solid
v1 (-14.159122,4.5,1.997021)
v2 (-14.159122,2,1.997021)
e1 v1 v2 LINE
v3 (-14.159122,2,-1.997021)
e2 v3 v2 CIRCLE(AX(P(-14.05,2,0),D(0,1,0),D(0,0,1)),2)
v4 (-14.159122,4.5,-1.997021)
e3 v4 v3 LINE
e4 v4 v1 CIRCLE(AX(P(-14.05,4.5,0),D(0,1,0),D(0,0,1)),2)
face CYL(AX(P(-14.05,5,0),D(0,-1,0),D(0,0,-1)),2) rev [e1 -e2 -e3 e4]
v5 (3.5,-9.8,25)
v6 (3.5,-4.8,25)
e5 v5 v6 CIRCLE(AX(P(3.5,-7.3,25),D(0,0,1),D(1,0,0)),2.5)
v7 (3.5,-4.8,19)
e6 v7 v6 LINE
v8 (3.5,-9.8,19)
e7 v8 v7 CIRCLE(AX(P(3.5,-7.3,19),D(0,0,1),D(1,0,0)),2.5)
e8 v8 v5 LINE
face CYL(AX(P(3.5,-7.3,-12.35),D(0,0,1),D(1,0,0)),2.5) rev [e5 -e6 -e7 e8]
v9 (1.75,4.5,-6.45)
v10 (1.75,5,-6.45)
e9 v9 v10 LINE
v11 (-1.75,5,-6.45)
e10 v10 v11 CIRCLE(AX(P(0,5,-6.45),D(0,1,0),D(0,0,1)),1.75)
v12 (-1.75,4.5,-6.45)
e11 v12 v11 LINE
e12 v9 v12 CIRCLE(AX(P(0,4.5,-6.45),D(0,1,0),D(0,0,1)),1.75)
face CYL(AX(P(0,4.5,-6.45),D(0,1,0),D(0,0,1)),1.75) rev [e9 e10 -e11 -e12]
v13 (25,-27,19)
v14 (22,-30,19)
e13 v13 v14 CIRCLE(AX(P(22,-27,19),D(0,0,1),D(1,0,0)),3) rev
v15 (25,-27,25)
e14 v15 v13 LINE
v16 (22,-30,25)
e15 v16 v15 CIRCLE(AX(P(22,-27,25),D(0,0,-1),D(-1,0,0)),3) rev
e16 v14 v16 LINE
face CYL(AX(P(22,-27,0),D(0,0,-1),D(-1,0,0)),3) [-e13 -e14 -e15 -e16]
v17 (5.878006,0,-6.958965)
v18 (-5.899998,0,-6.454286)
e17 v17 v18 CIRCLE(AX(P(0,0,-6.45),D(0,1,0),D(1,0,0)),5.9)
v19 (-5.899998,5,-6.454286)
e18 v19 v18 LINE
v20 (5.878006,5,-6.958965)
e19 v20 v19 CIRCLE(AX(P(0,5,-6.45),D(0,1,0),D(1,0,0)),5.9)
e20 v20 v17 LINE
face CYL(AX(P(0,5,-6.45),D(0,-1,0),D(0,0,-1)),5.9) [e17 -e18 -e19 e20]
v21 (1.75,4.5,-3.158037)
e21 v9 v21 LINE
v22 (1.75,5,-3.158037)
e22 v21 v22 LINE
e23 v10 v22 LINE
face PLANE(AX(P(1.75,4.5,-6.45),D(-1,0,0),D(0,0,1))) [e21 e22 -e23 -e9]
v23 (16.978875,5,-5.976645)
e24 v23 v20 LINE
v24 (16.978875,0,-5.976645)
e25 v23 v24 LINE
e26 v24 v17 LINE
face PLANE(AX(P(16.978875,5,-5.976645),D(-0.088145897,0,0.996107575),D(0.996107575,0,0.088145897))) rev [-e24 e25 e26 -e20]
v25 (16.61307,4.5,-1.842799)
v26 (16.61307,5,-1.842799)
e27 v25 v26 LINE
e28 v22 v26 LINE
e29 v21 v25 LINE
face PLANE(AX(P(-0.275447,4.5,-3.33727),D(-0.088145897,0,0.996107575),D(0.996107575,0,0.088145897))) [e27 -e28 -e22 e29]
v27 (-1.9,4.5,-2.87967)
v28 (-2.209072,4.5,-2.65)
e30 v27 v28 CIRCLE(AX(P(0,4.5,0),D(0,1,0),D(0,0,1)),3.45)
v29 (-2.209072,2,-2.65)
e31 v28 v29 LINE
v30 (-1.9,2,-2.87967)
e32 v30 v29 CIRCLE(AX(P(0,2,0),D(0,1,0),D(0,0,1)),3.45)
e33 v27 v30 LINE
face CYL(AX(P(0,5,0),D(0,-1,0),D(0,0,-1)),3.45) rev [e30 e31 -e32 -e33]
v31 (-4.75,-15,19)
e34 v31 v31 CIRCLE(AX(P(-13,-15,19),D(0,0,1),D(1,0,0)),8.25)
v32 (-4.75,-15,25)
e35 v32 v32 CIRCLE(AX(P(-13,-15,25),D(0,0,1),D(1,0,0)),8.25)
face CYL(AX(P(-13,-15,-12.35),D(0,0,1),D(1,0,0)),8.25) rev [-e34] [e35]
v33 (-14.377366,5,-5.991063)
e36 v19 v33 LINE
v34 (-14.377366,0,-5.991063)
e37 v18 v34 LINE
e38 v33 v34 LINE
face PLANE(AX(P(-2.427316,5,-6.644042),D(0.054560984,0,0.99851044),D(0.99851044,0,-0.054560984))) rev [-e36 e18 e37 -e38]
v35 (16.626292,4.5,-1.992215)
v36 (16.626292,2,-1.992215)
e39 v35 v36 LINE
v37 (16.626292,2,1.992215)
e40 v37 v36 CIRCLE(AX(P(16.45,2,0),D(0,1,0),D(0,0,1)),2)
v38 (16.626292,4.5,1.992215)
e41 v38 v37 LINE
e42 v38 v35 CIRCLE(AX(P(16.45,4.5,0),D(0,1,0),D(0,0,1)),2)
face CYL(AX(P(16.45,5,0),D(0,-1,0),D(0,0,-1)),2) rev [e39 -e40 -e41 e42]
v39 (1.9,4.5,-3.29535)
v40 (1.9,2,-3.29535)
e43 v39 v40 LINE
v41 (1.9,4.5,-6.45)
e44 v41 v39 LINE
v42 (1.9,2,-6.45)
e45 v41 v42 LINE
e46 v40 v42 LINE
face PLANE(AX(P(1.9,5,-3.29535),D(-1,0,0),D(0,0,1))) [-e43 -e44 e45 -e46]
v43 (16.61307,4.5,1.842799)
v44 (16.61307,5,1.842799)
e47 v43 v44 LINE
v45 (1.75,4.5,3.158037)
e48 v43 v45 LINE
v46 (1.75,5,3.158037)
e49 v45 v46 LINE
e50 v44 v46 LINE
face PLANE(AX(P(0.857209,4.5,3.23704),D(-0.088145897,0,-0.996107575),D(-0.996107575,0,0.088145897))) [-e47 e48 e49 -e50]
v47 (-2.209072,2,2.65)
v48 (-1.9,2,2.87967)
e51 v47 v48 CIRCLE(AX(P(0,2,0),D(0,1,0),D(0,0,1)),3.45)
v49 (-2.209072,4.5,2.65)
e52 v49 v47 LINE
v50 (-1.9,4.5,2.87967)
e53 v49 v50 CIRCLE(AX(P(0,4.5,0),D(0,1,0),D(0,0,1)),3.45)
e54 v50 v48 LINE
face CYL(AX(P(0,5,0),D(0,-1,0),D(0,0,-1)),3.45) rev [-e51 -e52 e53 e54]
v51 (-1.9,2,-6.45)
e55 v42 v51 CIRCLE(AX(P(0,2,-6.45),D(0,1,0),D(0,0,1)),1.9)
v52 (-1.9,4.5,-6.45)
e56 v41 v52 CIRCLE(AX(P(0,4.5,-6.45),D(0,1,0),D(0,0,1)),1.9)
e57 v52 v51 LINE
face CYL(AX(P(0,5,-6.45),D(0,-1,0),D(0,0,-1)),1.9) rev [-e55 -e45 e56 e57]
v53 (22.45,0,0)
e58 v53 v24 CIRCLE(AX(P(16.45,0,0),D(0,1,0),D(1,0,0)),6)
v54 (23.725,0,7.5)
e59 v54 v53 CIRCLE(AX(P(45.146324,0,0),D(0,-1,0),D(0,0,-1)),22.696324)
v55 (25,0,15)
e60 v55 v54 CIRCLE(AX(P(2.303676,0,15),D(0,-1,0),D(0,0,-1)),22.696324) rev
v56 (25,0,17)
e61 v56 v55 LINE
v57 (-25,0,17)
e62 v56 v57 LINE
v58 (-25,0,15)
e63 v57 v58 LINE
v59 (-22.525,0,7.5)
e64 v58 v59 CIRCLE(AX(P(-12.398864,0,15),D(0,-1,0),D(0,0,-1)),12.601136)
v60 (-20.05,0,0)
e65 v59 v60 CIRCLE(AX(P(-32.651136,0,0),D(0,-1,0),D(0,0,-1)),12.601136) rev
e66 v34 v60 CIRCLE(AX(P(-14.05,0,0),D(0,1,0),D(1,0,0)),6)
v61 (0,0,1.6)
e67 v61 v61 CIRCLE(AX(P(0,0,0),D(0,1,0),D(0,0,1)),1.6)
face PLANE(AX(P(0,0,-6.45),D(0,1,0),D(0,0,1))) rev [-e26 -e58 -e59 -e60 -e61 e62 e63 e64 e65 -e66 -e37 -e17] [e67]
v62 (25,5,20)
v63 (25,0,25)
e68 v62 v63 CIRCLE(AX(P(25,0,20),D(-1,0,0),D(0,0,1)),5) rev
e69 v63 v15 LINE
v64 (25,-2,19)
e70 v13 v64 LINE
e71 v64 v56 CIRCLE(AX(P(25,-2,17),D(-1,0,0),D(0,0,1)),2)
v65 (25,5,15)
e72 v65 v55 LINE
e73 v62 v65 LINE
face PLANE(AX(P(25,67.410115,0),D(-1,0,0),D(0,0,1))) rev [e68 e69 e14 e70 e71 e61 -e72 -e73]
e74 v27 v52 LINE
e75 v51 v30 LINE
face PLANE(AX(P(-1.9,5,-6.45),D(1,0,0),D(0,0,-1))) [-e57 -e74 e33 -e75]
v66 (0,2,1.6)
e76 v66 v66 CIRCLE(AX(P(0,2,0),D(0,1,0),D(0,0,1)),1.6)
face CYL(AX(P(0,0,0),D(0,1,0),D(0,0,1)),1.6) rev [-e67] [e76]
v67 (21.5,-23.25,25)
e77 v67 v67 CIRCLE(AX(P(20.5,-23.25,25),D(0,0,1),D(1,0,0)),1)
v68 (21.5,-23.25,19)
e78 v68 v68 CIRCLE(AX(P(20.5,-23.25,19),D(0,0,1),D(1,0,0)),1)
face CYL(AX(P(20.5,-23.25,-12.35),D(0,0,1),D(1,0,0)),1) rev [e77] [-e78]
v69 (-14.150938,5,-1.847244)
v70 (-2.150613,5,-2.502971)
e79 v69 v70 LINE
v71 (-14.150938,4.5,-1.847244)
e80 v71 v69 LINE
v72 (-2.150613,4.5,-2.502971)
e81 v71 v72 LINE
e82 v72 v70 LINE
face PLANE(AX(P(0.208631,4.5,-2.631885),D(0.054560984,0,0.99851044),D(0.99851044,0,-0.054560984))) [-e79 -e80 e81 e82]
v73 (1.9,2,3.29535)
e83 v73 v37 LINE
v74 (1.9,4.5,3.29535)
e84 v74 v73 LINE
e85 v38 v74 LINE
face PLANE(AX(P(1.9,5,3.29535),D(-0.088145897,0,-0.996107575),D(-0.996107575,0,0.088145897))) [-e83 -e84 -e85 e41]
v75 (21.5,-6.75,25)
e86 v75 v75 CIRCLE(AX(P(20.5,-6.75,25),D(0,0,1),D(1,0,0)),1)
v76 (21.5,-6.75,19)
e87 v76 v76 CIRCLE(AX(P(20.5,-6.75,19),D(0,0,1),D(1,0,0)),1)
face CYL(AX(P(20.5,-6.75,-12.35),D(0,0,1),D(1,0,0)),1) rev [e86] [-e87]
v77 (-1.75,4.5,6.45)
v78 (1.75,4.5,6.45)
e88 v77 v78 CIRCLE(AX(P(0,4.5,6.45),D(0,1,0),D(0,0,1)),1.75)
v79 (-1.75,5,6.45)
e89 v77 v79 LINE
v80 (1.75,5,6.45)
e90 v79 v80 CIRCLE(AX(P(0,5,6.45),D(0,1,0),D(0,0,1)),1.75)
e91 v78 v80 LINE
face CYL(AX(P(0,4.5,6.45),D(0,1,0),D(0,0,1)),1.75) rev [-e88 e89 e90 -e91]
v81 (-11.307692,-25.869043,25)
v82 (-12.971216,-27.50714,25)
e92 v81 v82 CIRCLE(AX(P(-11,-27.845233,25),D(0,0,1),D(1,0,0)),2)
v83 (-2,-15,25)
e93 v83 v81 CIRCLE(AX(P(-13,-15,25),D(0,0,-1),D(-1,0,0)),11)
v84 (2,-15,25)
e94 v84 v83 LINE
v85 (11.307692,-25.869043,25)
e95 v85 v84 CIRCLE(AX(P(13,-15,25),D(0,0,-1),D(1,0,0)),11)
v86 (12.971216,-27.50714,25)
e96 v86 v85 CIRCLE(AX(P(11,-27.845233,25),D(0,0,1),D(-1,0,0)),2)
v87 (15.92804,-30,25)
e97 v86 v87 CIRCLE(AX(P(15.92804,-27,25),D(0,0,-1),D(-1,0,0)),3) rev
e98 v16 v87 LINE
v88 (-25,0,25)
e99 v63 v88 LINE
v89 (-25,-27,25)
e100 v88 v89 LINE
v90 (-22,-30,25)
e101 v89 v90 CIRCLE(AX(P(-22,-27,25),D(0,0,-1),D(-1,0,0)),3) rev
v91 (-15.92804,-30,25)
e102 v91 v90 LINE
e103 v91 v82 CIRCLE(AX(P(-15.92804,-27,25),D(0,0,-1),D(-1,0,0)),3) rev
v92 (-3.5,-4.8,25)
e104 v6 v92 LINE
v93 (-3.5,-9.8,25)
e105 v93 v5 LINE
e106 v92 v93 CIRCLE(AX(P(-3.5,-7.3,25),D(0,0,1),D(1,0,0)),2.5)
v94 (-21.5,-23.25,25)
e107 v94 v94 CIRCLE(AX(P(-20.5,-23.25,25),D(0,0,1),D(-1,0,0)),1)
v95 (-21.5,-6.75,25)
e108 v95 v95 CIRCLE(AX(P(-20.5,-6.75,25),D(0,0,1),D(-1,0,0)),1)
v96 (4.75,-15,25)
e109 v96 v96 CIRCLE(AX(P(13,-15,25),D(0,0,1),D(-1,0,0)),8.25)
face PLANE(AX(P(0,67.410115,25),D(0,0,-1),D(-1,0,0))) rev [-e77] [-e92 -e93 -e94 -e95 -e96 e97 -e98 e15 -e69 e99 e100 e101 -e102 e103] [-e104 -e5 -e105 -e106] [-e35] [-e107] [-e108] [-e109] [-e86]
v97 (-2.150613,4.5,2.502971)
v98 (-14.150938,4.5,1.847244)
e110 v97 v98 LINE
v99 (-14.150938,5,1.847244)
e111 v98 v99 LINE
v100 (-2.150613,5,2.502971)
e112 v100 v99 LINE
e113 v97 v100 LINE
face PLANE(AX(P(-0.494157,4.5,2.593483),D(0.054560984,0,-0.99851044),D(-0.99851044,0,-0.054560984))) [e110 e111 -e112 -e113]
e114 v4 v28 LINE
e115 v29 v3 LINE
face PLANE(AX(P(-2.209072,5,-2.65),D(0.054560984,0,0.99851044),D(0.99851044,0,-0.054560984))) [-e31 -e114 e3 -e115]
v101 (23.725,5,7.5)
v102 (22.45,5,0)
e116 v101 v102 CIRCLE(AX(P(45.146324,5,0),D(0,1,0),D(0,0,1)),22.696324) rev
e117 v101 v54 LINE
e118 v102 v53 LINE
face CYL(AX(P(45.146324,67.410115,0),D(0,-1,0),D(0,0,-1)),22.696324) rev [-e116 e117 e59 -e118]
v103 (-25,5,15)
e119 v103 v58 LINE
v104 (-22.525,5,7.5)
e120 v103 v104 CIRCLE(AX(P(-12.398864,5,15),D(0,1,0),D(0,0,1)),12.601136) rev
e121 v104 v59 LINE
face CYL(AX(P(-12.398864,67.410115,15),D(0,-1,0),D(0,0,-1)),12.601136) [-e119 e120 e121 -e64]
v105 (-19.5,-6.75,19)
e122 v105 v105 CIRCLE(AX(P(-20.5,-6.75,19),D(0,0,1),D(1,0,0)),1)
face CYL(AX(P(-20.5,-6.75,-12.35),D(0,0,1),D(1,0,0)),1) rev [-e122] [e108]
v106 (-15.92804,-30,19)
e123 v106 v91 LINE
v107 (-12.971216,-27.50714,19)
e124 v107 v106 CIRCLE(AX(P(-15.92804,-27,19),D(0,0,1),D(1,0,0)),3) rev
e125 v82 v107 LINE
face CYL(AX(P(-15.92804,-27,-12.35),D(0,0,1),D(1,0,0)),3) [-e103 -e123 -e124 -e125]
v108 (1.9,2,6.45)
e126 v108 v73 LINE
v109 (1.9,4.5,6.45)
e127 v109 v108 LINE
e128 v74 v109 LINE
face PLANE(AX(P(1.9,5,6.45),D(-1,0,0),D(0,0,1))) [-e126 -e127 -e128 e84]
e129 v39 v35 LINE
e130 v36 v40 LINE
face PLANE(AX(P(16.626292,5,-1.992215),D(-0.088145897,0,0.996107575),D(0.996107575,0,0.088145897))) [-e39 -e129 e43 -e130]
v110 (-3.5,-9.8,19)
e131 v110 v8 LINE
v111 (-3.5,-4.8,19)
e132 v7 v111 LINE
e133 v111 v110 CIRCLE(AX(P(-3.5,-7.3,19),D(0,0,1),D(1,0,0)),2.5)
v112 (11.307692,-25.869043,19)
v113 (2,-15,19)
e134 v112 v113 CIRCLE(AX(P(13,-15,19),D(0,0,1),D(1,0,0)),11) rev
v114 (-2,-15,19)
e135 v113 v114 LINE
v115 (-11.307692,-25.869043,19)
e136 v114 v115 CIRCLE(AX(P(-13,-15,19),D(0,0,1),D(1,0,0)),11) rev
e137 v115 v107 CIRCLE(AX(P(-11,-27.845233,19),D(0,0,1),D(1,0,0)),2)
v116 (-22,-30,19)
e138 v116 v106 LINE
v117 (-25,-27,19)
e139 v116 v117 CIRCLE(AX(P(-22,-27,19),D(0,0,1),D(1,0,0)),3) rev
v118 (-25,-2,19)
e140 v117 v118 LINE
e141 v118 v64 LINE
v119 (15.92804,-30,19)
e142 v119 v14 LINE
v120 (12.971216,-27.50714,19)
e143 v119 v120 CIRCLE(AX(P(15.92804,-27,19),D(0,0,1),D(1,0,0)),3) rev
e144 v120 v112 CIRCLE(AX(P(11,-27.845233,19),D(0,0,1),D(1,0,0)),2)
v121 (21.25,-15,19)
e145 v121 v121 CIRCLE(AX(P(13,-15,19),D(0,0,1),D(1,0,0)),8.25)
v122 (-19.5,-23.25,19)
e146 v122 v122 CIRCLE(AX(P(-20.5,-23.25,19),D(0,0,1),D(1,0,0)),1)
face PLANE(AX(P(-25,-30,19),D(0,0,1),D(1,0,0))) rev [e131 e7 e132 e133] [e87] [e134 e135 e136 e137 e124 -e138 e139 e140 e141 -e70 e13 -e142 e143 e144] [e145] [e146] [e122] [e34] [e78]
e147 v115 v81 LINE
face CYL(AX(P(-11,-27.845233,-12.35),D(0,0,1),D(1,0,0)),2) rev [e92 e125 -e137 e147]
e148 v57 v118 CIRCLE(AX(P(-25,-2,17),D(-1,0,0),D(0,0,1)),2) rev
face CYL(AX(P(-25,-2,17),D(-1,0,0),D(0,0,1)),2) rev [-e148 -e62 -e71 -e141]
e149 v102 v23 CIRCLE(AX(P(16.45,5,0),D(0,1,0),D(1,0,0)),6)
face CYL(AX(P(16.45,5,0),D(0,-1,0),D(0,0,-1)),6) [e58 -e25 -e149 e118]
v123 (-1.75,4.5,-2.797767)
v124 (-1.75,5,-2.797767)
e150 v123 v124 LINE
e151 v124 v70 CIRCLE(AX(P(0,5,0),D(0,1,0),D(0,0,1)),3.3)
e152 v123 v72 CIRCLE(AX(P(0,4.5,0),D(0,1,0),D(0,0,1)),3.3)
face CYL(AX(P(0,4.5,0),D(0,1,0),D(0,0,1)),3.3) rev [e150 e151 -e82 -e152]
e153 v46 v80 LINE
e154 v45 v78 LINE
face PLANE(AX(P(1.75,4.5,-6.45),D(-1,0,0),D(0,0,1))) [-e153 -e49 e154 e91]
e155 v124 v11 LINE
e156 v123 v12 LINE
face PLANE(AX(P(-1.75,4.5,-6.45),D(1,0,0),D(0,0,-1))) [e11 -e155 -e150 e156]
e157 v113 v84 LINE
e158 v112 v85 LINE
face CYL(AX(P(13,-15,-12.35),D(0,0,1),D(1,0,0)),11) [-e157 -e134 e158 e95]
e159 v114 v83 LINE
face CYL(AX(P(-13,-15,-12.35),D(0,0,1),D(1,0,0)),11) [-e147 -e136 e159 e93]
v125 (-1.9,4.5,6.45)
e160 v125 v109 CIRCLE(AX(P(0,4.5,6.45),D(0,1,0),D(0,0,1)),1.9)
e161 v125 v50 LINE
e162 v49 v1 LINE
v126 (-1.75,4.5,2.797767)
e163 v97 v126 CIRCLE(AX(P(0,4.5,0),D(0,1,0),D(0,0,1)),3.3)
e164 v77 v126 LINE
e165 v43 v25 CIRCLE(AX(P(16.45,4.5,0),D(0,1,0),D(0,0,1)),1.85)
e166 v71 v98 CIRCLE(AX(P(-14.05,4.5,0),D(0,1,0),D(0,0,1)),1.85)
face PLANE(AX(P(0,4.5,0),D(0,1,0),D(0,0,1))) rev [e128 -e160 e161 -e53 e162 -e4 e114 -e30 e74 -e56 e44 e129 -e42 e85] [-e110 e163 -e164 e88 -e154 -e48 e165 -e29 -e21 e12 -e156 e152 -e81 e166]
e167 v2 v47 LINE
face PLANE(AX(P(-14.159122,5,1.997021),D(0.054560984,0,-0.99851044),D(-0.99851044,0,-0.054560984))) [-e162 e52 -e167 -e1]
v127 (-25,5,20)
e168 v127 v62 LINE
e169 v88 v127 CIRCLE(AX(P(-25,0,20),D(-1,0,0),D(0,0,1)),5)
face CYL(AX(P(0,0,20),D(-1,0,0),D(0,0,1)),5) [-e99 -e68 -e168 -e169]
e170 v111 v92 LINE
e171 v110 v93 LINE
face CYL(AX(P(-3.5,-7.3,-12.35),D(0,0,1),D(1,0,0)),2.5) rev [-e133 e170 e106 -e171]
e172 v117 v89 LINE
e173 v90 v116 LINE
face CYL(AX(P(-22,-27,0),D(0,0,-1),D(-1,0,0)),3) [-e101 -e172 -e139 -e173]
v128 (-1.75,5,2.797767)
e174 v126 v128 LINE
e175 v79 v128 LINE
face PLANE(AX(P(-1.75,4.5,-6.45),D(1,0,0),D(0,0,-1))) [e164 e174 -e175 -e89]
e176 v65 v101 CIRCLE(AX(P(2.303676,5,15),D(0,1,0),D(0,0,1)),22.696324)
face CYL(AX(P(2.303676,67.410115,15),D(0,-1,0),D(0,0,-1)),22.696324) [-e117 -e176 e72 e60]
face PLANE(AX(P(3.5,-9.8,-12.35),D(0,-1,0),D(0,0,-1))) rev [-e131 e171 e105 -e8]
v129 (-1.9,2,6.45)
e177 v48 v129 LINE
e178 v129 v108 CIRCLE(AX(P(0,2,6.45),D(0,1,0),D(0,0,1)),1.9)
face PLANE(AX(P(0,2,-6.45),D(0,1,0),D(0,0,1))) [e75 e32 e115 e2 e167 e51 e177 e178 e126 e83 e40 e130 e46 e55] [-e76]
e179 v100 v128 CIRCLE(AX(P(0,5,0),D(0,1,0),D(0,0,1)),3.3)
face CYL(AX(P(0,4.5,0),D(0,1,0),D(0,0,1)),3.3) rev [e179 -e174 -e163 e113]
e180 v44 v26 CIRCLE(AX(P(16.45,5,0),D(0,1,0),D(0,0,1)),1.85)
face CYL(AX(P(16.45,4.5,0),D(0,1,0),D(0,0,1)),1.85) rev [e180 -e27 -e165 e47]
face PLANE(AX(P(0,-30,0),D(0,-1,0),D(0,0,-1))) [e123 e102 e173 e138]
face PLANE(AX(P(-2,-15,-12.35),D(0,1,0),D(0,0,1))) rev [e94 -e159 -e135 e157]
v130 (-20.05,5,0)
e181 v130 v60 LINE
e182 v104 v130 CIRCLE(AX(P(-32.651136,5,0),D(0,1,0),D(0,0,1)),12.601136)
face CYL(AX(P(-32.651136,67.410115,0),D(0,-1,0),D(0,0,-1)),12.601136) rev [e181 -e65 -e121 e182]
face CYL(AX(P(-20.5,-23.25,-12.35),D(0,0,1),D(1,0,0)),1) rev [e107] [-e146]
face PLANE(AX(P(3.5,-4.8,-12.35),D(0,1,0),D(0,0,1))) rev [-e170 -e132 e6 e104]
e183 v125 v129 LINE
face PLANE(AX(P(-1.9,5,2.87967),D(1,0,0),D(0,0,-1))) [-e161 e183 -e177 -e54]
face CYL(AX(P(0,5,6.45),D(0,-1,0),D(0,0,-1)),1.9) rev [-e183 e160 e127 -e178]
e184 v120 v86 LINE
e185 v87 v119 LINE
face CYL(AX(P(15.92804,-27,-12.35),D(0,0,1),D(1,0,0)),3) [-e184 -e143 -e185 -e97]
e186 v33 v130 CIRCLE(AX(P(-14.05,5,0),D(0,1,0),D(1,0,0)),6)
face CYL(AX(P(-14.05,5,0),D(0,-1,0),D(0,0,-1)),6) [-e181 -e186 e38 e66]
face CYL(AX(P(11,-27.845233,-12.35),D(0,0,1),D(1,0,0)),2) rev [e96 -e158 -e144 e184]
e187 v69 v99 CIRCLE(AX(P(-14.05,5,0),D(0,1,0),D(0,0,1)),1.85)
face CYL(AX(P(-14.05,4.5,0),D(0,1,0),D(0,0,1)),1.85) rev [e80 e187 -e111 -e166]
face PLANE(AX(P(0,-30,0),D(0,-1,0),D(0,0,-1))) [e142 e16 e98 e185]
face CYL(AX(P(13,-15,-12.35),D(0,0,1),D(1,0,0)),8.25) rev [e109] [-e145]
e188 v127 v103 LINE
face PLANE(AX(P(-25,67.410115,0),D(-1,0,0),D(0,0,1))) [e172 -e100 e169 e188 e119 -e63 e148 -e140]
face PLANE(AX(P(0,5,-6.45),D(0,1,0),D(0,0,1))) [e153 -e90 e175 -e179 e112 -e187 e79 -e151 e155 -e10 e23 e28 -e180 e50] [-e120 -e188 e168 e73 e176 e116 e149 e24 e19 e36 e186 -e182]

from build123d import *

# Parameters (mm, degrees)
EXTRUDE_THIN1_DEPTH = 5
BOSS_EXTRUDE1_DEPTH = 2
SKETCH3_R           = 1.6
CUT_EXTRUDE1_DEPTH  = 26.797771221
BOSS_EXTRUDE2_DEPTH = 5
SKETCH8_W           = 50
SKETCH8_H           = 6
BOSS_EXTRUDE6_DEPTH = 30
SKETCH10_R          = 8.25
SKETCH10_R_2        = 1
CUT_EXTRUDE2_DEPTH  = 55.037232534
FILLET2_R           = 5
FILLET4_R           = 3
EXTRUDE_THIN2_START = 4.5
EXTRUDE_THIN2_DEPTH = 0.5
FILLET5_R           = 2


# Read off the part's stored shape, not the designer's step: Extrude-Thin1, Boss-Extrude1, Extrude-Thin2
with BuildPart() as part:
    # Extrude-Thin1 outline → Extrude-Thin1 (new body)
    with BuildSketch(Plane(origin=(0, 0, 0), x_dir=(1, 0, 0), z_dir=(0, 1, 0))):
        with BuildLine():
            ThreePointArc((5.878005996, 6.958965141), (-0.252578975, 12.344591068), (-5.899998443, 6.454286146))
            Line((-5.899998443, 6.454286146), (-14.377365901, 5.991062641))
            ThreePointArc((-14.377365901, 5.991062641), (-20.05, 0), (-14.377365901, -5.991062641))
            Line((-14.377365901, -5.991062641), (-5.899998443, -6.454286146))
            ThreePointArc((-5.899998443, -6.454286146), (-0.252578975, -12.344591068), (5.878005996, -6.958965141))
            Line((5.878005996, -6.958965141), (16.97887538, -5.97664545))
            ThreePointArc((16.97887538, -5.97664545), (22.45, 0), (16.97887538, 5.97664545))
            Line((16.97887538, 5.97664545), (5.878005996, 6.958965141))
        make_face()
        with BuildLine():
            Line((-1.9, 2.87967012), (-1.9, 6.45))
            ThreePointArc((-1.9, 6.45), (0, 8.35), (1.9, 6.45))
            Line((1.9, 6.45), (1.9, 3.295349698))
            Line((1.9, 3.295349698), (16.626291793, 1.99221515))
            ThreePointArc((16.626291793, 1.99221515), (18.45, 0), (16.626291793, -1.99221515))
            Line((16.626291793, -1.99221515), (1.9, -3.295349698))
            Line((1.9, -3.295349698), (1.9, -6.45))
            ThreePointArc((1.9, -6.45), (0, -8.35), (-1.9, -6.45))
            Line((-1.9, -6.45), (-1.9, -2.87967012))
            ThreePointArc((-1.9, -2.87967012), (-2.057742861, -2.769150468), (-2.209072203, -2.65))
            Line((-2.209072203, -2.65), (-14.159121967, -1.99702088))
            ThreePointArc((-14.159121967, -1.99702088), (-16.05, 0), (-14.159121967, 1.99702088))
            Line((-14.159121967, 1.99702088), (-2.209072203, 2.65))
            ThreePointArc((-2.209072203, 2.65), (-2.057742861, 2.769150468), (-1.9, 2.87967012))
        make_face(mode=Mode.SUBTRACT)
    extrude(amount=EXTRUDE_THIN1_DEPTH)

    # Boss-Extrude1 outline → Boss-Extrude1 (add)
    with BuildSketch(Plane(origin=(0, 0, 0), x_dir=(1, 0, 0), z_dir=(0, 1, 0))):
        with BuildLine():
            ThreePointArc((1.9, 6.45), (0, 8.35), (-1.9, 6.45))
            Line((-1.9, 6.45), (-1.9, 2.87967012))
            ThreePointArc((-1.9, 2.87967012), (-2.057742861, 2.769150468), (-2.209072203, 2.65))
            Line((-2.209072203, 2.65), (-14.159121967, 1.99702088))
            ThreePointArc((-14.159121967, 1.99702088), (-16.05, 0), (-14.159121967, -1.99702088))
            Line((-14.159121967, -1.99702088), (-2.209072203, -2.65))
            ThreePointArc((-2.209072203, -2.65), (-2.057742861, -2.769150468), (-1.9, -2.87967012))
            Line((-1.9, -2.87967012), (-1.9, -6.45))
            ThreePointArc((-1.9, -6.45), (0, -8.35), (1.9, -6.45))
            Line((1.9, -6.45), (1.9, -3.295349698))
            Line((1.9, -3.295349698), (16.626291793, -1.99221515))
            ThreePointArc((16.626291793, -1.99221515), (18.45, 0), (16.626291793, 1.99221515))
            Line((16.626291793, 1.99221515), (1.9, 3.295349698))
            Line((1.9, 3.295349698), (1.9, 6.45))
        make_face()
    extrude(amount=BOSS_EXTRUDE1_DEPTH)

    # Sketch3 → Cut-Extrude1 (cut, through all)
    with BuildSketch(Plane(origin=(0, 2, 0), x_dir=(1, 0, 0), z_dir=(0, 1, 0))):
        with Locations(Location((0, 0, 0), (0, 0, 270))):
            Circle(SKETCH3_R)
    extrude(amount=-CUT_EXTRUDE1_DEPTH, mode=Mode.SUBTRACT)

    # Sketch4 → Boss-Extrude2 (add)
    # profile 1 of 2: a face of its own
    with BuildSketch(Plane.XZ):
        with BuildLine():
            Line((25, 25), (-25, 25))
            Line((-25, 25), (-25, 15))
            ThreePointArc((-25, 15), (-24.365263739, 11.051087966), (-22.525, 7.5))
            ThreePointArc((-22.525, 7.5), (-20.684736261, 3.948912034), (-20.05, 0))
            ThreePointArc((-20.05, 0), (-18.406844925, 4.125276027), (-14.377365901, 5.991062641))
            Line((-14.377365901, 5.991062641), (-5.899998443, 6.454286146))
            ThreePointArc((-5.899998443, 6.454286146), (-0.252578976, 12.344591068), (5.878005996, 6.958965141))
            Line((5.878005996, 6.958965141), (16.97887538, 5.97664545))
            ThreePointArc((16.97887538, 5.97664545), (20.875678043, 4.051342229), (22.45, 0))
            ThreePointArc((22.45, 0), (22.77102028, 3.803801552), (23.725, 7.5))
            ThreePointArc((23.725, 7.5), (24.67897972, 11.196198448), (25, 15))
            Line((25, 15), (25, 25))
        make_face()
    # profile 2 of 2: a face of its own
    with BuildSketch(Plane.XZ):
        with BuildLine():
            Line((-14.377365901, -5.991062641), (-5.899998443, -6.454286146))
            ThreePointArc((-5.899998443, -6.454286146), (-0.252578976, -12.344591068), (5.878005996, -6.958965141))
            Line((5.878005996, -6.958965141), (16.97887538, -5.97664545))
            ThreePointArc((16.97887538, -5.97664545), (22.45, 0), (16.97887538, 5.97664545))
            Line((16.97887538, 5.97664545), (5.878005996, 6.958965141))
            ThreePointArc((5.878005996, 6.958965141), (-0.252578976, 12.344591068), (-5.899998443, 6.454286146))
            Line((-5.899998443, 6.454286146), (-14.377365901, 5.991062641))
            ThreePointArc((-14.377365901, 5.991062641), (-20.05, 0), (-14.377365901, -5.991062641))
        make_face()
        with BuildLine():
            ThreePointArc((16.626291793, -1.99221515), (18.45, 0), (16.626291793, 1.99221515))
            Line((16.626291793, 1.99221515), (1.9, 3.295349698))
            Line((1.9, 3.295349698), (1.9, 6.45))
            ThreePointArc((1.9, 6.45), (0, 8.35), (-1.9, 6.45))
            Line((-1.9, 6.45), (-1.9, 2.87967012))
            ThreePointArc((-1.9, 2.87967012), (-2.057742862, 2.769150468), (-2.209072203, 2.65))
            Line((-2.209072203, 2.65), (-14.159121967, 1.99702088))
            ThreePointArc((-14.159121967, 1.99702088), (-16.05, 0), (-14.159121967, -1.99702088))
            Line((-14.159121967, -1.99702088), (-2.209072203, -2.65))
            ThreePointArc((-2.209072203, -2.65), (-2.057742862, -2.769150468), (-1.9, -2.87967012))
            Line((-1.9, -2.87967012), (-1.9, -6.45))
            ThreePointArc((-1.9, -6.45), (0, -8.35), (1.9, -6.45))
            Line((1.9, -6.45), (1.9, -3.295349698))
            Line((1.9, -3.295349698), (16.626291793, -1.99221515))
        make_face(mode=Mode.SUBTRACT)
    extrude(amount=-BOSS_EXTRUDE2_DEPTH)

    # Sketch8 → Boss-Extrude6 (add)
    with BuildSketch(Plane.XZ):
        with Locations((0, 22)):
            Rectangle(SKETCH8_W, SKETCH8_H)
    extrude(amount=BOSS_EXTRUDE6_DEPTH)

    # Sketch10 → Cut-Extrude2 (cut, through all)
    with BuildSketch(Plane.XY.offset(25)):
        with Locations((-13, -15)):
            Circle(SKETCH10_R)
        with Locations((13, -15)):
            Circle(SKETCH10_R)
        with Locations((20.5, -6.75)):
            Circle(SKETCH10_R_2)
        with Locations((20.5, -23.25)):
            Circle(SKETCH10_R_2)
        with Locations((-20.5, -23.25)):
            Circle(SKETCH10_R_2)
        with Locations((-20.5, -6.75)):
            Circle(SKETCH10_R_2)
        with BuildLine():
            Line((3.5, -9.8), (-3.5, -9.8))
            ThreePointArc((-3.5, -9.8), (-6, -7.3), (-3.5, -4.8))
            Line((-3.5, -4.8), (3.5, -4.8))
            ThreePointArc((3.5, -4.8), (6, -7.3), (3.5, -9.8))
        make_face()
        with BuildLine():
            Line((-2, -15), (2, -15))
            ThreePointArc((2, -15), (4.644900222, -22.154879991), (11.307692308, -25.869042951))
            ThreePointArc((11.307692308, -25.869042951), (12.519109051, -26.544345307), (13, -27.845232579))
            Line((13, -27.845232579), (13, -30))
            Line((13, -30), (-13, -30))
            Line((-13, -30), (-13, -27.845232579))
            ThreePointArc((-13, -27.845232579), (-12.519109051, -26.544345307), (-11.307692308, -25.869042951))
            ThreePointArc((-11.307692308, -25.869042951), (-4.644900222, -22.154879991), (-2, -15))
        make_face()
    extrude(amount=-CUT_EXTRUDE2_DEPTH, mode=Mode.SUBTRACT)

    # Fillet2
    fillet2_edges = [part.edges().sort_by_distance(p)[0] for p in [
        (0, 5, 25),
    ]]
    fillet(fillet2_edges, radius=FILLET2_R)

    # Fillet4
    fillet4_edges = [part.edges().sort_by_distance(p)[0] for p in [
        (25, -30, 22),
        (-25, -30, 22),
        (13, -30, 22),
        (-13, -30, 22),
    ]]
    fillet(fillet4_edges, radius=FILLET4_R)

    # Extrude-Thin2 outline → Extrude-Thin2 (add)
    with BuildSketch(Plane(origin=(0, 0, 0), x_dir=(1, 0, 0), z_dir=(0, 1, 0)).offset(EXTRUDE_THIN2_START)):
        with BuildLine():
            ThreePointArc((1.9, 6.45), (0, 8.35), (-1.9, 6.45))
            Line((-1.9, 6.45), (-1.9, 2.87967012))
            ThreePointArc((-1.9, 2.87967012), (-2.057742861, 2.769150468), (-2.209072203, 2.65))
            Line((-2.209072203, 2.65), (-14.159121967, 1.99702088))
            ThreePointArc((-14.159121967, 1.99702088), (-16.05, 0), (-14.159121967, -1.99702088))
            Line((-14.159121967, -1.99702088), (-2.209072203, -2.65))
            ThreePointArc((-2.209072203, -2.65), (-2.057742861, -2.769150468), (-1.9, -2.87967012))
            Line((-1.9, -2.87967012), (-1.9, -6.45))
            ThreePointArc((-1.9, -6.45), (0, -8.35), (1.9, -6.45))
            Line((1.9, -6.45), (1.9, -3.295349698))
            Line((1.9, -3.295349698), (16.626291793, -1.99221515))
            ThreePointArc((16.626291793, -1.99221515), (18.45, 0), (16.626291793, 1.99221515))
            Line((16.626291793, 1.99221515), (1.9, 3.295349698))
            Line((1.9, 3.295349698), (1.9, 6.45))
        make_face()
        with BuildLine():
            ThreePointArc((-1.75, -2.797766967), (-1.955868768, -2.657927268), (-2.150613493, -2.502970556))
            Line((-2.150613493, -2.502970556), (-14.15093782, -1.847244314))
            ThreePointArc((-14.15093782, -1.847244314), (-15.9, 0), (-14.15093782, 1.847244314))
            Line((-14.15093782, 1.847244314), (-2.150613493, 2.502970556))
            ThreePointArc((-2.150613493, 2.502970556), (-1.955868768, 2.657927268), (-1.75, 2.797766967))
            Line((-1.75, 2.797766967), (-1.75, 6.45))
            ThreePointArc((-1.75, 6.45), (0, 8.2), (1.75, 6.45))
            Line((1.75, 6.45), (1.75, 3.158037104))
            Line((1.75, 3.158037104), (16.613069909, 1.842799014))
            ThreePointArc((16.613069909, 1.842799014), (18.3, 0), (16.613069909, -1.842799014))
            Line((16.613069909, -1.842799014), (1.75, -3.158037104))
            Line((1.75, -3.158037104), (1.75, -6.45))
            ThreePointArc((1.75, -6.45), (0, -8.2), (-1.75, -6.45))
            Line((-1.75, -6.45), (-1.75, -2.797766967))
        make_face(mode=Mode.SUBTRACT)
    extrude(amount=EXTRUDE_THIN2_DEPTH)

    # Fillet5
    fillet5_edges = [part.edges().sort_by_distance(p)[0] for p in [
        (0, 0, 19),
    ]]
    fillet(fillet5_edges, radius=FILLET5_R)


solid = part.part
